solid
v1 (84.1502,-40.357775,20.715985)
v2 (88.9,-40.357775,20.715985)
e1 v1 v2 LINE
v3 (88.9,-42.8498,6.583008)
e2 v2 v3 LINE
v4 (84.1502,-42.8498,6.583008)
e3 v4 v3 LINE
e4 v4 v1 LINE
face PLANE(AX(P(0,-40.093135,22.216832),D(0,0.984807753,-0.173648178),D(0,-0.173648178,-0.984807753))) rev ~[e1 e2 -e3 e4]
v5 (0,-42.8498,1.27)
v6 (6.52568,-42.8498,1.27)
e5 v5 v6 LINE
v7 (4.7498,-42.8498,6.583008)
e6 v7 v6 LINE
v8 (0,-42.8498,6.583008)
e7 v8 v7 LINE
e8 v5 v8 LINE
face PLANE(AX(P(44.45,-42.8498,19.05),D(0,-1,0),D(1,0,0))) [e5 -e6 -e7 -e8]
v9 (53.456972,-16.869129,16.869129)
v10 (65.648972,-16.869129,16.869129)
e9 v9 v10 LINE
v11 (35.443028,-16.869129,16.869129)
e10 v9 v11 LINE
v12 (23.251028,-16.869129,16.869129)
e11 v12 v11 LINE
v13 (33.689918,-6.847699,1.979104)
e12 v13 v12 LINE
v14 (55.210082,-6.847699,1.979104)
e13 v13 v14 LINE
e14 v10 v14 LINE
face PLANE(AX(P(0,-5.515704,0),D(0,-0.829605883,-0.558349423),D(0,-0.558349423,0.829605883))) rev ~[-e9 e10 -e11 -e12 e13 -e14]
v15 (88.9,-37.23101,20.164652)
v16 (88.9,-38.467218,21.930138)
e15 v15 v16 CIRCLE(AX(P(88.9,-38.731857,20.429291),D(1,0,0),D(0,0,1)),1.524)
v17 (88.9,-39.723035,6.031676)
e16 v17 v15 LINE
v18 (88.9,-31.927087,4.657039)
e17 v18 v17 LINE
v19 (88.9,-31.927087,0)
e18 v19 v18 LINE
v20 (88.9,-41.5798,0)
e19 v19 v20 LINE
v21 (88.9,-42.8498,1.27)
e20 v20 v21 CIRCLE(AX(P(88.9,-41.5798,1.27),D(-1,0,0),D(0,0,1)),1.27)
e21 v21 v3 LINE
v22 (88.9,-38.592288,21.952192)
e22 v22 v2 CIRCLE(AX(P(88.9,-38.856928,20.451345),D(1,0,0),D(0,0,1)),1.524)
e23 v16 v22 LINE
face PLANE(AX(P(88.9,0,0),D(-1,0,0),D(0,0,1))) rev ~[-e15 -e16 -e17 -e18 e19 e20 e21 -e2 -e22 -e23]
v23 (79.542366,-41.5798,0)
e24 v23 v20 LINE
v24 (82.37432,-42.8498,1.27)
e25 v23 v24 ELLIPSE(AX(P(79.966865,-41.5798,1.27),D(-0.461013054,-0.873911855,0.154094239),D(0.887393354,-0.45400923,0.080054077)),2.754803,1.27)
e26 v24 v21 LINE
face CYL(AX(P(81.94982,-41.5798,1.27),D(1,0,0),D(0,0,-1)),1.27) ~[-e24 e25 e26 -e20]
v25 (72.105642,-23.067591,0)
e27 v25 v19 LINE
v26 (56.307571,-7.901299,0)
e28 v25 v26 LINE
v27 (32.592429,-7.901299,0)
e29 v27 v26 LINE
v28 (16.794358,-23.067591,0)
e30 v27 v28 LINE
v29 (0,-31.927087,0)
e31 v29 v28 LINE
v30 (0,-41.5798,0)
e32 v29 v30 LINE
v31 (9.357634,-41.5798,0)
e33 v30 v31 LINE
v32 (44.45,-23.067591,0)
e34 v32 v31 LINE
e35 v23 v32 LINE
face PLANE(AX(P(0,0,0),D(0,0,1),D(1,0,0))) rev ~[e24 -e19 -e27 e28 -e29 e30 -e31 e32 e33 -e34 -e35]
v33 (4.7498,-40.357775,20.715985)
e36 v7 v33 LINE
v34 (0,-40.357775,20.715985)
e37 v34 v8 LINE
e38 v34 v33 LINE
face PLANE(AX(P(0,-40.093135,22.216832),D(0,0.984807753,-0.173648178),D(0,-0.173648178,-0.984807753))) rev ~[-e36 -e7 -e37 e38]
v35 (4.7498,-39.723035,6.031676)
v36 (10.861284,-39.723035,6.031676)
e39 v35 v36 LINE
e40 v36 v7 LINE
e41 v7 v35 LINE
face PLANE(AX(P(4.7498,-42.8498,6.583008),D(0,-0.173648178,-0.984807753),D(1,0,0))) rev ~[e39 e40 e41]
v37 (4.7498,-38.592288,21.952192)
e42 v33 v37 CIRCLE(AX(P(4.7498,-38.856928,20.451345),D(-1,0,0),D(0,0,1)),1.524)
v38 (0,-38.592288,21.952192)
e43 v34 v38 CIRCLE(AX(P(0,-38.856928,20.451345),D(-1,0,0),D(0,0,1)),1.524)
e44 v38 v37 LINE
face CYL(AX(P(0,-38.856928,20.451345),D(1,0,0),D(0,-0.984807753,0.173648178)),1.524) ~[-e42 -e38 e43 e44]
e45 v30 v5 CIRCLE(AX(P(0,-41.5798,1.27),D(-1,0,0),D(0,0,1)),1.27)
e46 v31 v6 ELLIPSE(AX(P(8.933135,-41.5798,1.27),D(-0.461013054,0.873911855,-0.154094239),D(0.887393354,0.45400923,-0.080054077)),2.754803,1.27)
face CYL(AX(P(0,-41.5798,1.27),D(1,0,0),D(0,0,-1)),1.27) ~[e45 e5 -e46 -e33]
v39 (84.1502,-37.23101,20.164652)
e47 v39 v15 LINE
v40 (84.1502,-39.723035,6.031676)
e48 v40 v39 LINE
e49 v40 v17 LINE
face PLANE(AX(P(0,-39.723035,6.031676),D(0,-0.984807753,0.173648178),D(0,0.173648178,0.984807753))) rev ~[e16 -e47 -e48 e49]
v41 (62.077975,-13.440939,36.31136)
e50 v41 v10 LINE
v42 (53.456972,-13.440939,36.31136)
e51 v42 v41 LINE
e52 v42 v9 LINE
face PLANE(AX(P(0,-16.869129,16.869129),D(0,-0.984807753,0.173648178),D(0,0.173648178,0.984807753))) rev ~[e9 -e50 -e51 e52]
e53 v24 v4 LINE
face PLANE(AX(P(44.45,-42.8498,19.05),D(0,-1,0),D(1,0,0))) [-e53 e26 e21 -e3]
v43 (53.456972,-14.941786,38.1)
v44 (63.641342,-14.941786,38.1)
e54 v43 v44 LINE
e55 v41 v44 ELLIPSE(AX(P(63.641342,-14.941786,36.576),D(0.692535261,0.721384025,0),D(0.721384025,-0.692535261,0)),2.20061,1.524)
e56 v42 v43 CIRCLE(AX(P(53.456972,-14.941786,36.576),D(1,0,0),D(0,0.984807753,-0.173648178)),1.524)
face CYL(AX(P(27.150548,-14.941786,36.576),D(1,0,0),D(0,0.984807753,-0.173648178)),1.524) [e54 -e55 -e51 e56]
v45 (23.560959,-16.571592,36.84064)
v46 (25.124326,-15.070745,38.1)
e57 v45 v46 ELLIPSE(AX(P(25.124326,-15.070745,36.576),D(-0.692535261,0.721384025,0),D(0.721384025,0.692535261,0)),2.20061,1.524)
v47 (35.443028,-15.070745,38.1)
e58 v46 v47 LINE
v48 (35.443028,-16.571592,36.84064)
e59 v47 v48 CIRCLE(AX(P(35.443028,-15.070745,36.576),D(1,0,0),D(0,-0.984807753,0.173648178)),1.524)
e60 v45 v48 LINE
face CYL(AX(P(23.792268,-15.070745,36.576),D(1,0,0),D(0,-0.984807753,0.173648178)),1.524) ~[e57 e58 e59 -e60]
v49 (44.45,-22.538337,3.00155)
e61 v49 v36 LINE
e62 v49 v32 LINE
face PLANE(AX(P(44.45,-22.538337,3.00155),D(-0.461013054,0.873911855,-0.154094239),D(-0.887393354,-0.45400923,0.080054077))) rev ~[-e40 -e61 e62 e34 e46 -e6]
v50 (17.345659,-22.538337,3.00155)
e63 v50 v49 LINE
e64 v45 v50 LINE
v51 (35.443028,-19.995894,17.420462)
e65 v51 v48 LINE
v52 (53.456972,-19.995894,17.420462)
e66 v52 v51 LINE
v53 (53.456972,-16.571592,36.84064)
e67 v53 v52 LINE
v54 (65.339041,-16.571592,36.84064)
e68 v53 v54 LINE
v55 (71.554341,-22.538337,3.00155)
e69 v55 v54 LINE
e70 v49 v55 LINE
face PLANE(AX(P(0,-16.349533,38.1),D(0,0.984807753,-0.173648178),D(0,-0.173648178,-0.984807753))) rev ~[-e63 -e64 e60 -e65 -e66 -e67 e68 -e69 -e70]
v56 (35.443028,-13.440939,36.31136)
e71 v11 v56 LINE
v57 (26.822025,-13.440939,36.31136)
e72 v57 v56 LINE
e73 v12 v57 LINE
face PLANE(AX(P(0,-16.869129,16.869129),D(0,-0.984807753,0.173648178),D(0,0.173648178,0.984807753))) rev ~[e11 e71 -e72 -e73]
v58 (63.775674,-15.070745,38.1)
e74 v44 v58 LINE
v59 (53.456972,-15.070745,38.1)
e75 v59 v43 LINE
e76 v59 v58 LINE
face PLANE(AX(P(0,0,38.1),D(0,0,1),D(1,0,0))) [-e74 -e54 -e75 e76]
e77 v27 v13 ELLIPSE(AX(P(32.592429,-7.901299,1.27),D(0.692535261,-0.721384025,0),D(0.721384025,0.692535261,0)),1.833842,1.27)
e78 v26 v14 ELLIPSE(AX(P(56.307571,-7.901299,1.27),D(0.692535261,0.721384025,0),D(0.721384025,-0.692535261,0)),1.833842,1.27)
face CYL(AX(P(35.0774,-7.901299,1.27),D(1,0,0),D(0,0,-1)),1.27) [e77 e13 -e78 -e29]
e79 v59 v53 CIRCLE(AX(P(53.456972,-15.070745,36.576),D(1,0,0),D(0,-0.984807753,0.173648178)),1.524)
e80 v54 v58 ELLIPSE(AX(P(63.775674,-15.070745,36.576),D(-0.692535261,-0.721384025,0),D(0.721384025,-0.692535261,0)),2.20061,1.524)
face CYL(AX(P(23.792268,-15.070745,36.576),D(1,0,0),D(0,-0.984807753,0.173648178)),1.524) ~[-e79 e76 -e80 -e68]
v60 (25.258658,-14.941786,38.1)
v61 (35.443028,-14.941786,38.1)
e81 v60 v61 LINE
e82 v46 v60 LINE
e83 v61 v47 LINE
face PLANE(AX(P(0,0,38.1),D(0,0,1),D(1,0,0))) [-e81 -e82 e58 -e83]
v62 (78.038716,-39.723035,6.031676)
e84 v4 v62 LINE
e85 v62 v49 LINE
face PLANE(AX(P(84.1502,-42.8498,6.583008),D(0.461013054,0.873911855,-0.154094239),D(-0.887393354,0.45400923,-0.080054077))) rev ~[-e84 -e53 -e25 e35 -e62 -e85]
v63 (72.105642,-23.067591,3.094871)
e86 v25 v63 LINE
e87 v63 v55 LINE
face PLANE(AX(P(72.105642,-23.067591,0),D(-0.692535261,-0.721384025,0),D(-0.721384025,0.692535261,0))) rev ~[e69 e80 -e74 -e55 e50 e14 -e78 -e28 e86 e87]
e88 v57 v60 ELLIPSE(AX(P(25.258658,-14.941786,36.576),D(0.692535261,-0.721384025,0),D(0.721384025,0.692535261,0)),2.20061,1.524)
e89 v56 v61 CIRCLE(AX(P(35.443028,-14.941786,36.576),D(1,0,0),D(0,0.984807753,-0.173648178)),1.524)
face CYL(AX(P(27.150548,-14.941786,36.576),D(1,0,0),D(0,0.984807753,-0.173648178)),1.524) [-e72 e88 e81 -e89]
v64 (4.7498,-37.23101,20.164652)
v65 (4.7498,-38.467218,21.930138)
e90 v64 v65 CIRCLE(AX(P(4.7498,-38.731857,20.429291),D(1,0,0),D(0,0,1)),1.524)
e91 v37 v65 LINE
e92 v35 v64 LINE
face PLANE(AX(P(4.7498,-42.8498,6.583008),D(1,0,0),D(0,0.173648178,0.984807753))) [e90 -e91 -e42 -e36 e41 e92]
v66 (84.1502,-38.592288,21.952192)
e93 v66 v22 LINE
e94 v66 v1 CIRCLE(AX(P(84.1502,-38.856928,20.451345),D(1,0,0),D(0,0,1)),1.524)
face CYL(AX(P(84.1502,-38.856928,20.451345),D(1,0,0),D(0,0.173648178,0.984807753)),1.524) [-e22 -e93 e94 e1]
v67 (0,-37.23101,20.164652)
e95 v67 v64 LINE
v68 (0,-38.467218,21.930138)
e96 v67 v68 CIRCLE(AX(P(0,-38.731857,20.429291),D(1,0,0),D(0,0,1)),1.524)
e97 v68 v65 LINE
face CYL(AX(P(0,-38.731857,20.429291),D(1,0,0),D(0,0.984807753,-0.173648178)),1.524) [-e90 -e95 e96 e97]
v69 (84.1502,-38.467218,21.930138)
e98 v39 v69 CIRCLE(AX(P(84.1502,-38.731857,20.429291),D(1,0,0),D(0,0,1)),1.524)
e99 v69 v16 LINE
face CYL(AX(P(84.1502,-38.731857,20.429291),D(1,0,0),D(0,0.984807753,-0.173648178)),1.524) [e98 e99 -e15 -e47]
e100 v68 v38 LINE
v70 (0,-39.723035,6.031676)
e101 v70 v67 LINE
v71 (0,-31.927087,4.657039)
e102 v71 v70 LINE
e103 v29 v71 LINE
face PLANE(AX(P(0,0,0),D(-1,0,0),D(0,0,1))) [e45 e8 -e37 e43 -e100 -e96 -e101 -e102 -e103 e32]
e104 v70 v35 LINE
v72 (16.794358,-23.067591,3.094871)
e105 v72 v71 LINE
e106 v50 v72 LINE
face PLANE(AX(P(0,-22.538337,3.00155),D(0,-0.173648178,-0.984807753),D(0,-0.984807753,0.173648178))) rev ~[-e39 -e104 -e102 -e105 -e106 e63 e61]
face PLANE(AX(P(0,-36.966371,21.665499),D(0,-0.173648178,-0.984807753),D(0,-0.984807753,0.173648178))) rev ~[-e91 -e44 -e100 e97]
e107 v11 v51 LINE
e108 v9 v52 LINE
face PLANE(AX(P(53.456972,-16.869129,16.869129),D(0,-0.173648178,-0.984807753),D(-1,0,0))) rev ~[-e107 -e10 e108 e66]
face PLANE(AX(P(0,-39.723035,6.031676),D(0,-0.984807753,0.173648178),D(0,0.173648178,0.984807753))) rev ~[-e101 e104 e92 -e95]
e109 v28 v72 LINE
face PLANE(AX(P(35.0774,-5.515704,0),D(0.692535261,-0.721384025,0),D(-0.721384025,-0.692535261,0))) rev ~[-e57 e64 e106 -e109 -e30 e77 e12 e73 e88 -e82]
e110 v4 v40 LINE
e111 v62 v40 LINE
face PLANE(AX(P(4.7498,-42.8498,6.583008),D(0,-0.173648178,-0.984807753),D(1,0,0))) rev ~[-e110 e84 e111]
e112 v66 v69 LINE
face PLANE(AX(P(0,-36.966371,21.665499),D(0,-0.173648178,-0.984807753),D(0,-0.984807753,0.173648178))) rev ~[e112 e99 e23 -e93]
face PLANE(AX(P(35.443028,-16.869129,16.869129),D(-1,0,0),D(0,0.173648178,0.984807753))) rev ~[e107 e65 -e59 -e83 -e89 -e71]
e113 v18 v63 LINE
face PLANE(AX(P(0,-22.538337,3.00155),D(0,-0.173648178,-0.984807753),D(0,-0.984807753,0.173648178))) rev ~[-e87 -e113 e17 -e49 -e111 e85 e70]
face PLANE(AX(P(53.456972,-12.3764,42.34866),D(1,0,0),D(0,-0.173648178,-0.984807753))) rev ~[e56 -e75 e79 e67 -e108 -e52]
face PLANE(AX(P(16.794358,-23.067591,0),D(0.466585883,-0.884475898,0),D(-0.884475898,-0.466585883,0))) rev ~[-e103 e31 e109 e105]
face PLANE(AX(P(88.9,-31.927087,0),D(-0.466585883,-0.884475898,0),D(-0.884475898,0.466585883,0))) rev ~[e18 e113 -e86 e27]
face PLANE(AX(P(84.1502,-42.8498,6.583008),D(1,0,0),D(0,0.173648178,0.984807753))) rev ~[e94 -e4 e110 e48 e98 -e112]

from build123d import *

# Parameters (mm, degrees)
F0_W      = 88.9
F0_H      = 38.1
F1_DEPTH  = 42.8498
F3_DEPTH  = 127
F4_W      = 79.4004
F4_H      = 15.875
F5_DEPTH  = 6.35
F7_DEPTH  = 25.4
F9_DEPTH  = 127
F10_R     = 1.524
F12_DEPTH = 25.4
F13_R     = 1.27
F14_W     = 18.0139442934
F14_H     = 19.7421588048
F14_H_2   = 6.130434971
F15_DEPTH = 25.4


with BuildPart() as f1:
    # F0 (on Front) → F1 (new body)
    with BuildSketch(Plane.XZ):
        with Locations((44.45, 19.05)):
            Rectangle(F0_W, F0_H)
    extrude(amount=F1_DEPTH)

    # F2 (on face) → F3 (cut)
    with BuildSketch(Plane(origin=(0, 0, 0), x_dir=(0, -1, 0), z_dir=(-1, 0, 0))):
        Polygon((16.8691291251, 16.8691291251), (13.1255537659, 38.1), (0, 38.1), (0, 0), (5.515703716, 0), align=None)
        Polygon((16.3495332586, 38.1), (22.5383370557, 3.0015495405), (39.7230353842, 6.0316755111), (36.9663705637, 21.6654985902), (40.0931351795, 22.2168315543), (42.8498, 6.5830084752), (42.8498, 38.1), align=None)
    extrude(amount=-F3_DEPTH, mode=Mode.SUBTRACT)

    # F4 (on face) → F5 (cut)
    with BuildSketch(Plane(origin=(0, -42.6834811822, 7.526249363), x_dir=(1, 0, 0), z_dir=(0, -0.984807753, 0.1736481777))):
        with Locations((44.45, 6.9797081012)):
            Rectangle(F4_W, F4_H)
    extrude(amount=-F5_DEPTH, mode=Mode.SUBTRACT)

    # F6 (on face) → F7 (cut)
    with BuildSketch(Plane(origin=(0, -0.1663188178, -0.9432408877), x_dir=(1, 0, 0), z_dir=(0, 0.1736481777, 0.984807753))):
        Polygon((16.7943580049, -22.7171426803), (0, -22.7171426803), (0, -31.4420426803), align=None)
        Polygon((84.1502, -43.3419426803), (44.45, -22.7171426803), (4.7498, -43.3419426803), align=None)
        Polygon((88.9, -22.7171426803), (72.1056419951, -22.7171426803), (88.9, -31.4420426803), align=None)
    extrude(amount=-F7_DEPTH, mode=Mode.SUBTRACT)

    # F8 (on face) → F9 (cut)
    with BuildSketch(Plane(origin=(0, 0, 0), x_dir=(1, 0, 0), z_dir=(0, 0, -1))):
        Polygon((35.0774, 5.515703716), (16.7943580049, 23.0675912236), (0, 23.0675912236), (0, 5.515703716), align=None)
        Polygon((72.1056419951, 23.0675912236), (53.8226, 5.515703716), (88.9, 5.515703716), (88.9, 23.0675912236), align=None)
    extrude(amount=-F9_DEPTH, mode=Mode.SUBTRACT)

    # F10
    f10_edges = [f1.edges().sort_by_distance(p)[0] for p in [
        (44.45, -13.125554, 38.1),
        (44.45, -16.349533, 38.1),
        (2.3749, -36.966371, 21.665499),
        (2.3749, -40.093135, 22.216832),
        (86.5251, -36.966371, 21.665499),
        (86.5251, -40.093135, 22.216832),
    ]]
    fillet(f10_edges, radius=F10_R)

    # F11 (on face) → F12 (cut)
    with BuildSketch(Plane(origin=(0, 0, 0), x_dir=(1, 0, 0), z_dir=(0, 0, -1))):
        Polygon((16.7943580049, 23.0675912236), (0, 31.9270868696), (0, 30.7840723544), (16.1012234683, 21.7536620769), align=None)
        Polygon((88.9, 31.9270868696), (72.1056419951, 23.0675912236), (72.6024817226, 22.125765121), (88.9, 30.4145570844), align=None)
    extrude(amount=-F12_DEPTH, mode=Mode.SUBTRACT)

    # F13
    f13_edges = [f1.edges().sort_by_distance(p)[0] for p in [
        (44.45, -5.515704, 0),
        (85.42491, -42.8498, 0),
        (3.47509, -42.8498, 0),
    ]]
    fillet(f13_edges, radius=F13_R)

    # F14 (on face) → F15 (cut)
    with BuildSketch(Plane(origin=(0, -19.245253622, 3.3934574641), x_dir=(-1, 0, 0), z_dir=(0, 0.984807753, -0.1736481777))):
        with Locations((-44.45, 23.5546350199)):
            Rectangle(F14_W, F14_H)
        with Locations((-44.45, 36.4909319078)):
            Rectangle(F14_W, F14_H_2)
    extrude(amount=-F15_DEPTH, mode=Mode.SUBTRACT)


solid = f1.part
